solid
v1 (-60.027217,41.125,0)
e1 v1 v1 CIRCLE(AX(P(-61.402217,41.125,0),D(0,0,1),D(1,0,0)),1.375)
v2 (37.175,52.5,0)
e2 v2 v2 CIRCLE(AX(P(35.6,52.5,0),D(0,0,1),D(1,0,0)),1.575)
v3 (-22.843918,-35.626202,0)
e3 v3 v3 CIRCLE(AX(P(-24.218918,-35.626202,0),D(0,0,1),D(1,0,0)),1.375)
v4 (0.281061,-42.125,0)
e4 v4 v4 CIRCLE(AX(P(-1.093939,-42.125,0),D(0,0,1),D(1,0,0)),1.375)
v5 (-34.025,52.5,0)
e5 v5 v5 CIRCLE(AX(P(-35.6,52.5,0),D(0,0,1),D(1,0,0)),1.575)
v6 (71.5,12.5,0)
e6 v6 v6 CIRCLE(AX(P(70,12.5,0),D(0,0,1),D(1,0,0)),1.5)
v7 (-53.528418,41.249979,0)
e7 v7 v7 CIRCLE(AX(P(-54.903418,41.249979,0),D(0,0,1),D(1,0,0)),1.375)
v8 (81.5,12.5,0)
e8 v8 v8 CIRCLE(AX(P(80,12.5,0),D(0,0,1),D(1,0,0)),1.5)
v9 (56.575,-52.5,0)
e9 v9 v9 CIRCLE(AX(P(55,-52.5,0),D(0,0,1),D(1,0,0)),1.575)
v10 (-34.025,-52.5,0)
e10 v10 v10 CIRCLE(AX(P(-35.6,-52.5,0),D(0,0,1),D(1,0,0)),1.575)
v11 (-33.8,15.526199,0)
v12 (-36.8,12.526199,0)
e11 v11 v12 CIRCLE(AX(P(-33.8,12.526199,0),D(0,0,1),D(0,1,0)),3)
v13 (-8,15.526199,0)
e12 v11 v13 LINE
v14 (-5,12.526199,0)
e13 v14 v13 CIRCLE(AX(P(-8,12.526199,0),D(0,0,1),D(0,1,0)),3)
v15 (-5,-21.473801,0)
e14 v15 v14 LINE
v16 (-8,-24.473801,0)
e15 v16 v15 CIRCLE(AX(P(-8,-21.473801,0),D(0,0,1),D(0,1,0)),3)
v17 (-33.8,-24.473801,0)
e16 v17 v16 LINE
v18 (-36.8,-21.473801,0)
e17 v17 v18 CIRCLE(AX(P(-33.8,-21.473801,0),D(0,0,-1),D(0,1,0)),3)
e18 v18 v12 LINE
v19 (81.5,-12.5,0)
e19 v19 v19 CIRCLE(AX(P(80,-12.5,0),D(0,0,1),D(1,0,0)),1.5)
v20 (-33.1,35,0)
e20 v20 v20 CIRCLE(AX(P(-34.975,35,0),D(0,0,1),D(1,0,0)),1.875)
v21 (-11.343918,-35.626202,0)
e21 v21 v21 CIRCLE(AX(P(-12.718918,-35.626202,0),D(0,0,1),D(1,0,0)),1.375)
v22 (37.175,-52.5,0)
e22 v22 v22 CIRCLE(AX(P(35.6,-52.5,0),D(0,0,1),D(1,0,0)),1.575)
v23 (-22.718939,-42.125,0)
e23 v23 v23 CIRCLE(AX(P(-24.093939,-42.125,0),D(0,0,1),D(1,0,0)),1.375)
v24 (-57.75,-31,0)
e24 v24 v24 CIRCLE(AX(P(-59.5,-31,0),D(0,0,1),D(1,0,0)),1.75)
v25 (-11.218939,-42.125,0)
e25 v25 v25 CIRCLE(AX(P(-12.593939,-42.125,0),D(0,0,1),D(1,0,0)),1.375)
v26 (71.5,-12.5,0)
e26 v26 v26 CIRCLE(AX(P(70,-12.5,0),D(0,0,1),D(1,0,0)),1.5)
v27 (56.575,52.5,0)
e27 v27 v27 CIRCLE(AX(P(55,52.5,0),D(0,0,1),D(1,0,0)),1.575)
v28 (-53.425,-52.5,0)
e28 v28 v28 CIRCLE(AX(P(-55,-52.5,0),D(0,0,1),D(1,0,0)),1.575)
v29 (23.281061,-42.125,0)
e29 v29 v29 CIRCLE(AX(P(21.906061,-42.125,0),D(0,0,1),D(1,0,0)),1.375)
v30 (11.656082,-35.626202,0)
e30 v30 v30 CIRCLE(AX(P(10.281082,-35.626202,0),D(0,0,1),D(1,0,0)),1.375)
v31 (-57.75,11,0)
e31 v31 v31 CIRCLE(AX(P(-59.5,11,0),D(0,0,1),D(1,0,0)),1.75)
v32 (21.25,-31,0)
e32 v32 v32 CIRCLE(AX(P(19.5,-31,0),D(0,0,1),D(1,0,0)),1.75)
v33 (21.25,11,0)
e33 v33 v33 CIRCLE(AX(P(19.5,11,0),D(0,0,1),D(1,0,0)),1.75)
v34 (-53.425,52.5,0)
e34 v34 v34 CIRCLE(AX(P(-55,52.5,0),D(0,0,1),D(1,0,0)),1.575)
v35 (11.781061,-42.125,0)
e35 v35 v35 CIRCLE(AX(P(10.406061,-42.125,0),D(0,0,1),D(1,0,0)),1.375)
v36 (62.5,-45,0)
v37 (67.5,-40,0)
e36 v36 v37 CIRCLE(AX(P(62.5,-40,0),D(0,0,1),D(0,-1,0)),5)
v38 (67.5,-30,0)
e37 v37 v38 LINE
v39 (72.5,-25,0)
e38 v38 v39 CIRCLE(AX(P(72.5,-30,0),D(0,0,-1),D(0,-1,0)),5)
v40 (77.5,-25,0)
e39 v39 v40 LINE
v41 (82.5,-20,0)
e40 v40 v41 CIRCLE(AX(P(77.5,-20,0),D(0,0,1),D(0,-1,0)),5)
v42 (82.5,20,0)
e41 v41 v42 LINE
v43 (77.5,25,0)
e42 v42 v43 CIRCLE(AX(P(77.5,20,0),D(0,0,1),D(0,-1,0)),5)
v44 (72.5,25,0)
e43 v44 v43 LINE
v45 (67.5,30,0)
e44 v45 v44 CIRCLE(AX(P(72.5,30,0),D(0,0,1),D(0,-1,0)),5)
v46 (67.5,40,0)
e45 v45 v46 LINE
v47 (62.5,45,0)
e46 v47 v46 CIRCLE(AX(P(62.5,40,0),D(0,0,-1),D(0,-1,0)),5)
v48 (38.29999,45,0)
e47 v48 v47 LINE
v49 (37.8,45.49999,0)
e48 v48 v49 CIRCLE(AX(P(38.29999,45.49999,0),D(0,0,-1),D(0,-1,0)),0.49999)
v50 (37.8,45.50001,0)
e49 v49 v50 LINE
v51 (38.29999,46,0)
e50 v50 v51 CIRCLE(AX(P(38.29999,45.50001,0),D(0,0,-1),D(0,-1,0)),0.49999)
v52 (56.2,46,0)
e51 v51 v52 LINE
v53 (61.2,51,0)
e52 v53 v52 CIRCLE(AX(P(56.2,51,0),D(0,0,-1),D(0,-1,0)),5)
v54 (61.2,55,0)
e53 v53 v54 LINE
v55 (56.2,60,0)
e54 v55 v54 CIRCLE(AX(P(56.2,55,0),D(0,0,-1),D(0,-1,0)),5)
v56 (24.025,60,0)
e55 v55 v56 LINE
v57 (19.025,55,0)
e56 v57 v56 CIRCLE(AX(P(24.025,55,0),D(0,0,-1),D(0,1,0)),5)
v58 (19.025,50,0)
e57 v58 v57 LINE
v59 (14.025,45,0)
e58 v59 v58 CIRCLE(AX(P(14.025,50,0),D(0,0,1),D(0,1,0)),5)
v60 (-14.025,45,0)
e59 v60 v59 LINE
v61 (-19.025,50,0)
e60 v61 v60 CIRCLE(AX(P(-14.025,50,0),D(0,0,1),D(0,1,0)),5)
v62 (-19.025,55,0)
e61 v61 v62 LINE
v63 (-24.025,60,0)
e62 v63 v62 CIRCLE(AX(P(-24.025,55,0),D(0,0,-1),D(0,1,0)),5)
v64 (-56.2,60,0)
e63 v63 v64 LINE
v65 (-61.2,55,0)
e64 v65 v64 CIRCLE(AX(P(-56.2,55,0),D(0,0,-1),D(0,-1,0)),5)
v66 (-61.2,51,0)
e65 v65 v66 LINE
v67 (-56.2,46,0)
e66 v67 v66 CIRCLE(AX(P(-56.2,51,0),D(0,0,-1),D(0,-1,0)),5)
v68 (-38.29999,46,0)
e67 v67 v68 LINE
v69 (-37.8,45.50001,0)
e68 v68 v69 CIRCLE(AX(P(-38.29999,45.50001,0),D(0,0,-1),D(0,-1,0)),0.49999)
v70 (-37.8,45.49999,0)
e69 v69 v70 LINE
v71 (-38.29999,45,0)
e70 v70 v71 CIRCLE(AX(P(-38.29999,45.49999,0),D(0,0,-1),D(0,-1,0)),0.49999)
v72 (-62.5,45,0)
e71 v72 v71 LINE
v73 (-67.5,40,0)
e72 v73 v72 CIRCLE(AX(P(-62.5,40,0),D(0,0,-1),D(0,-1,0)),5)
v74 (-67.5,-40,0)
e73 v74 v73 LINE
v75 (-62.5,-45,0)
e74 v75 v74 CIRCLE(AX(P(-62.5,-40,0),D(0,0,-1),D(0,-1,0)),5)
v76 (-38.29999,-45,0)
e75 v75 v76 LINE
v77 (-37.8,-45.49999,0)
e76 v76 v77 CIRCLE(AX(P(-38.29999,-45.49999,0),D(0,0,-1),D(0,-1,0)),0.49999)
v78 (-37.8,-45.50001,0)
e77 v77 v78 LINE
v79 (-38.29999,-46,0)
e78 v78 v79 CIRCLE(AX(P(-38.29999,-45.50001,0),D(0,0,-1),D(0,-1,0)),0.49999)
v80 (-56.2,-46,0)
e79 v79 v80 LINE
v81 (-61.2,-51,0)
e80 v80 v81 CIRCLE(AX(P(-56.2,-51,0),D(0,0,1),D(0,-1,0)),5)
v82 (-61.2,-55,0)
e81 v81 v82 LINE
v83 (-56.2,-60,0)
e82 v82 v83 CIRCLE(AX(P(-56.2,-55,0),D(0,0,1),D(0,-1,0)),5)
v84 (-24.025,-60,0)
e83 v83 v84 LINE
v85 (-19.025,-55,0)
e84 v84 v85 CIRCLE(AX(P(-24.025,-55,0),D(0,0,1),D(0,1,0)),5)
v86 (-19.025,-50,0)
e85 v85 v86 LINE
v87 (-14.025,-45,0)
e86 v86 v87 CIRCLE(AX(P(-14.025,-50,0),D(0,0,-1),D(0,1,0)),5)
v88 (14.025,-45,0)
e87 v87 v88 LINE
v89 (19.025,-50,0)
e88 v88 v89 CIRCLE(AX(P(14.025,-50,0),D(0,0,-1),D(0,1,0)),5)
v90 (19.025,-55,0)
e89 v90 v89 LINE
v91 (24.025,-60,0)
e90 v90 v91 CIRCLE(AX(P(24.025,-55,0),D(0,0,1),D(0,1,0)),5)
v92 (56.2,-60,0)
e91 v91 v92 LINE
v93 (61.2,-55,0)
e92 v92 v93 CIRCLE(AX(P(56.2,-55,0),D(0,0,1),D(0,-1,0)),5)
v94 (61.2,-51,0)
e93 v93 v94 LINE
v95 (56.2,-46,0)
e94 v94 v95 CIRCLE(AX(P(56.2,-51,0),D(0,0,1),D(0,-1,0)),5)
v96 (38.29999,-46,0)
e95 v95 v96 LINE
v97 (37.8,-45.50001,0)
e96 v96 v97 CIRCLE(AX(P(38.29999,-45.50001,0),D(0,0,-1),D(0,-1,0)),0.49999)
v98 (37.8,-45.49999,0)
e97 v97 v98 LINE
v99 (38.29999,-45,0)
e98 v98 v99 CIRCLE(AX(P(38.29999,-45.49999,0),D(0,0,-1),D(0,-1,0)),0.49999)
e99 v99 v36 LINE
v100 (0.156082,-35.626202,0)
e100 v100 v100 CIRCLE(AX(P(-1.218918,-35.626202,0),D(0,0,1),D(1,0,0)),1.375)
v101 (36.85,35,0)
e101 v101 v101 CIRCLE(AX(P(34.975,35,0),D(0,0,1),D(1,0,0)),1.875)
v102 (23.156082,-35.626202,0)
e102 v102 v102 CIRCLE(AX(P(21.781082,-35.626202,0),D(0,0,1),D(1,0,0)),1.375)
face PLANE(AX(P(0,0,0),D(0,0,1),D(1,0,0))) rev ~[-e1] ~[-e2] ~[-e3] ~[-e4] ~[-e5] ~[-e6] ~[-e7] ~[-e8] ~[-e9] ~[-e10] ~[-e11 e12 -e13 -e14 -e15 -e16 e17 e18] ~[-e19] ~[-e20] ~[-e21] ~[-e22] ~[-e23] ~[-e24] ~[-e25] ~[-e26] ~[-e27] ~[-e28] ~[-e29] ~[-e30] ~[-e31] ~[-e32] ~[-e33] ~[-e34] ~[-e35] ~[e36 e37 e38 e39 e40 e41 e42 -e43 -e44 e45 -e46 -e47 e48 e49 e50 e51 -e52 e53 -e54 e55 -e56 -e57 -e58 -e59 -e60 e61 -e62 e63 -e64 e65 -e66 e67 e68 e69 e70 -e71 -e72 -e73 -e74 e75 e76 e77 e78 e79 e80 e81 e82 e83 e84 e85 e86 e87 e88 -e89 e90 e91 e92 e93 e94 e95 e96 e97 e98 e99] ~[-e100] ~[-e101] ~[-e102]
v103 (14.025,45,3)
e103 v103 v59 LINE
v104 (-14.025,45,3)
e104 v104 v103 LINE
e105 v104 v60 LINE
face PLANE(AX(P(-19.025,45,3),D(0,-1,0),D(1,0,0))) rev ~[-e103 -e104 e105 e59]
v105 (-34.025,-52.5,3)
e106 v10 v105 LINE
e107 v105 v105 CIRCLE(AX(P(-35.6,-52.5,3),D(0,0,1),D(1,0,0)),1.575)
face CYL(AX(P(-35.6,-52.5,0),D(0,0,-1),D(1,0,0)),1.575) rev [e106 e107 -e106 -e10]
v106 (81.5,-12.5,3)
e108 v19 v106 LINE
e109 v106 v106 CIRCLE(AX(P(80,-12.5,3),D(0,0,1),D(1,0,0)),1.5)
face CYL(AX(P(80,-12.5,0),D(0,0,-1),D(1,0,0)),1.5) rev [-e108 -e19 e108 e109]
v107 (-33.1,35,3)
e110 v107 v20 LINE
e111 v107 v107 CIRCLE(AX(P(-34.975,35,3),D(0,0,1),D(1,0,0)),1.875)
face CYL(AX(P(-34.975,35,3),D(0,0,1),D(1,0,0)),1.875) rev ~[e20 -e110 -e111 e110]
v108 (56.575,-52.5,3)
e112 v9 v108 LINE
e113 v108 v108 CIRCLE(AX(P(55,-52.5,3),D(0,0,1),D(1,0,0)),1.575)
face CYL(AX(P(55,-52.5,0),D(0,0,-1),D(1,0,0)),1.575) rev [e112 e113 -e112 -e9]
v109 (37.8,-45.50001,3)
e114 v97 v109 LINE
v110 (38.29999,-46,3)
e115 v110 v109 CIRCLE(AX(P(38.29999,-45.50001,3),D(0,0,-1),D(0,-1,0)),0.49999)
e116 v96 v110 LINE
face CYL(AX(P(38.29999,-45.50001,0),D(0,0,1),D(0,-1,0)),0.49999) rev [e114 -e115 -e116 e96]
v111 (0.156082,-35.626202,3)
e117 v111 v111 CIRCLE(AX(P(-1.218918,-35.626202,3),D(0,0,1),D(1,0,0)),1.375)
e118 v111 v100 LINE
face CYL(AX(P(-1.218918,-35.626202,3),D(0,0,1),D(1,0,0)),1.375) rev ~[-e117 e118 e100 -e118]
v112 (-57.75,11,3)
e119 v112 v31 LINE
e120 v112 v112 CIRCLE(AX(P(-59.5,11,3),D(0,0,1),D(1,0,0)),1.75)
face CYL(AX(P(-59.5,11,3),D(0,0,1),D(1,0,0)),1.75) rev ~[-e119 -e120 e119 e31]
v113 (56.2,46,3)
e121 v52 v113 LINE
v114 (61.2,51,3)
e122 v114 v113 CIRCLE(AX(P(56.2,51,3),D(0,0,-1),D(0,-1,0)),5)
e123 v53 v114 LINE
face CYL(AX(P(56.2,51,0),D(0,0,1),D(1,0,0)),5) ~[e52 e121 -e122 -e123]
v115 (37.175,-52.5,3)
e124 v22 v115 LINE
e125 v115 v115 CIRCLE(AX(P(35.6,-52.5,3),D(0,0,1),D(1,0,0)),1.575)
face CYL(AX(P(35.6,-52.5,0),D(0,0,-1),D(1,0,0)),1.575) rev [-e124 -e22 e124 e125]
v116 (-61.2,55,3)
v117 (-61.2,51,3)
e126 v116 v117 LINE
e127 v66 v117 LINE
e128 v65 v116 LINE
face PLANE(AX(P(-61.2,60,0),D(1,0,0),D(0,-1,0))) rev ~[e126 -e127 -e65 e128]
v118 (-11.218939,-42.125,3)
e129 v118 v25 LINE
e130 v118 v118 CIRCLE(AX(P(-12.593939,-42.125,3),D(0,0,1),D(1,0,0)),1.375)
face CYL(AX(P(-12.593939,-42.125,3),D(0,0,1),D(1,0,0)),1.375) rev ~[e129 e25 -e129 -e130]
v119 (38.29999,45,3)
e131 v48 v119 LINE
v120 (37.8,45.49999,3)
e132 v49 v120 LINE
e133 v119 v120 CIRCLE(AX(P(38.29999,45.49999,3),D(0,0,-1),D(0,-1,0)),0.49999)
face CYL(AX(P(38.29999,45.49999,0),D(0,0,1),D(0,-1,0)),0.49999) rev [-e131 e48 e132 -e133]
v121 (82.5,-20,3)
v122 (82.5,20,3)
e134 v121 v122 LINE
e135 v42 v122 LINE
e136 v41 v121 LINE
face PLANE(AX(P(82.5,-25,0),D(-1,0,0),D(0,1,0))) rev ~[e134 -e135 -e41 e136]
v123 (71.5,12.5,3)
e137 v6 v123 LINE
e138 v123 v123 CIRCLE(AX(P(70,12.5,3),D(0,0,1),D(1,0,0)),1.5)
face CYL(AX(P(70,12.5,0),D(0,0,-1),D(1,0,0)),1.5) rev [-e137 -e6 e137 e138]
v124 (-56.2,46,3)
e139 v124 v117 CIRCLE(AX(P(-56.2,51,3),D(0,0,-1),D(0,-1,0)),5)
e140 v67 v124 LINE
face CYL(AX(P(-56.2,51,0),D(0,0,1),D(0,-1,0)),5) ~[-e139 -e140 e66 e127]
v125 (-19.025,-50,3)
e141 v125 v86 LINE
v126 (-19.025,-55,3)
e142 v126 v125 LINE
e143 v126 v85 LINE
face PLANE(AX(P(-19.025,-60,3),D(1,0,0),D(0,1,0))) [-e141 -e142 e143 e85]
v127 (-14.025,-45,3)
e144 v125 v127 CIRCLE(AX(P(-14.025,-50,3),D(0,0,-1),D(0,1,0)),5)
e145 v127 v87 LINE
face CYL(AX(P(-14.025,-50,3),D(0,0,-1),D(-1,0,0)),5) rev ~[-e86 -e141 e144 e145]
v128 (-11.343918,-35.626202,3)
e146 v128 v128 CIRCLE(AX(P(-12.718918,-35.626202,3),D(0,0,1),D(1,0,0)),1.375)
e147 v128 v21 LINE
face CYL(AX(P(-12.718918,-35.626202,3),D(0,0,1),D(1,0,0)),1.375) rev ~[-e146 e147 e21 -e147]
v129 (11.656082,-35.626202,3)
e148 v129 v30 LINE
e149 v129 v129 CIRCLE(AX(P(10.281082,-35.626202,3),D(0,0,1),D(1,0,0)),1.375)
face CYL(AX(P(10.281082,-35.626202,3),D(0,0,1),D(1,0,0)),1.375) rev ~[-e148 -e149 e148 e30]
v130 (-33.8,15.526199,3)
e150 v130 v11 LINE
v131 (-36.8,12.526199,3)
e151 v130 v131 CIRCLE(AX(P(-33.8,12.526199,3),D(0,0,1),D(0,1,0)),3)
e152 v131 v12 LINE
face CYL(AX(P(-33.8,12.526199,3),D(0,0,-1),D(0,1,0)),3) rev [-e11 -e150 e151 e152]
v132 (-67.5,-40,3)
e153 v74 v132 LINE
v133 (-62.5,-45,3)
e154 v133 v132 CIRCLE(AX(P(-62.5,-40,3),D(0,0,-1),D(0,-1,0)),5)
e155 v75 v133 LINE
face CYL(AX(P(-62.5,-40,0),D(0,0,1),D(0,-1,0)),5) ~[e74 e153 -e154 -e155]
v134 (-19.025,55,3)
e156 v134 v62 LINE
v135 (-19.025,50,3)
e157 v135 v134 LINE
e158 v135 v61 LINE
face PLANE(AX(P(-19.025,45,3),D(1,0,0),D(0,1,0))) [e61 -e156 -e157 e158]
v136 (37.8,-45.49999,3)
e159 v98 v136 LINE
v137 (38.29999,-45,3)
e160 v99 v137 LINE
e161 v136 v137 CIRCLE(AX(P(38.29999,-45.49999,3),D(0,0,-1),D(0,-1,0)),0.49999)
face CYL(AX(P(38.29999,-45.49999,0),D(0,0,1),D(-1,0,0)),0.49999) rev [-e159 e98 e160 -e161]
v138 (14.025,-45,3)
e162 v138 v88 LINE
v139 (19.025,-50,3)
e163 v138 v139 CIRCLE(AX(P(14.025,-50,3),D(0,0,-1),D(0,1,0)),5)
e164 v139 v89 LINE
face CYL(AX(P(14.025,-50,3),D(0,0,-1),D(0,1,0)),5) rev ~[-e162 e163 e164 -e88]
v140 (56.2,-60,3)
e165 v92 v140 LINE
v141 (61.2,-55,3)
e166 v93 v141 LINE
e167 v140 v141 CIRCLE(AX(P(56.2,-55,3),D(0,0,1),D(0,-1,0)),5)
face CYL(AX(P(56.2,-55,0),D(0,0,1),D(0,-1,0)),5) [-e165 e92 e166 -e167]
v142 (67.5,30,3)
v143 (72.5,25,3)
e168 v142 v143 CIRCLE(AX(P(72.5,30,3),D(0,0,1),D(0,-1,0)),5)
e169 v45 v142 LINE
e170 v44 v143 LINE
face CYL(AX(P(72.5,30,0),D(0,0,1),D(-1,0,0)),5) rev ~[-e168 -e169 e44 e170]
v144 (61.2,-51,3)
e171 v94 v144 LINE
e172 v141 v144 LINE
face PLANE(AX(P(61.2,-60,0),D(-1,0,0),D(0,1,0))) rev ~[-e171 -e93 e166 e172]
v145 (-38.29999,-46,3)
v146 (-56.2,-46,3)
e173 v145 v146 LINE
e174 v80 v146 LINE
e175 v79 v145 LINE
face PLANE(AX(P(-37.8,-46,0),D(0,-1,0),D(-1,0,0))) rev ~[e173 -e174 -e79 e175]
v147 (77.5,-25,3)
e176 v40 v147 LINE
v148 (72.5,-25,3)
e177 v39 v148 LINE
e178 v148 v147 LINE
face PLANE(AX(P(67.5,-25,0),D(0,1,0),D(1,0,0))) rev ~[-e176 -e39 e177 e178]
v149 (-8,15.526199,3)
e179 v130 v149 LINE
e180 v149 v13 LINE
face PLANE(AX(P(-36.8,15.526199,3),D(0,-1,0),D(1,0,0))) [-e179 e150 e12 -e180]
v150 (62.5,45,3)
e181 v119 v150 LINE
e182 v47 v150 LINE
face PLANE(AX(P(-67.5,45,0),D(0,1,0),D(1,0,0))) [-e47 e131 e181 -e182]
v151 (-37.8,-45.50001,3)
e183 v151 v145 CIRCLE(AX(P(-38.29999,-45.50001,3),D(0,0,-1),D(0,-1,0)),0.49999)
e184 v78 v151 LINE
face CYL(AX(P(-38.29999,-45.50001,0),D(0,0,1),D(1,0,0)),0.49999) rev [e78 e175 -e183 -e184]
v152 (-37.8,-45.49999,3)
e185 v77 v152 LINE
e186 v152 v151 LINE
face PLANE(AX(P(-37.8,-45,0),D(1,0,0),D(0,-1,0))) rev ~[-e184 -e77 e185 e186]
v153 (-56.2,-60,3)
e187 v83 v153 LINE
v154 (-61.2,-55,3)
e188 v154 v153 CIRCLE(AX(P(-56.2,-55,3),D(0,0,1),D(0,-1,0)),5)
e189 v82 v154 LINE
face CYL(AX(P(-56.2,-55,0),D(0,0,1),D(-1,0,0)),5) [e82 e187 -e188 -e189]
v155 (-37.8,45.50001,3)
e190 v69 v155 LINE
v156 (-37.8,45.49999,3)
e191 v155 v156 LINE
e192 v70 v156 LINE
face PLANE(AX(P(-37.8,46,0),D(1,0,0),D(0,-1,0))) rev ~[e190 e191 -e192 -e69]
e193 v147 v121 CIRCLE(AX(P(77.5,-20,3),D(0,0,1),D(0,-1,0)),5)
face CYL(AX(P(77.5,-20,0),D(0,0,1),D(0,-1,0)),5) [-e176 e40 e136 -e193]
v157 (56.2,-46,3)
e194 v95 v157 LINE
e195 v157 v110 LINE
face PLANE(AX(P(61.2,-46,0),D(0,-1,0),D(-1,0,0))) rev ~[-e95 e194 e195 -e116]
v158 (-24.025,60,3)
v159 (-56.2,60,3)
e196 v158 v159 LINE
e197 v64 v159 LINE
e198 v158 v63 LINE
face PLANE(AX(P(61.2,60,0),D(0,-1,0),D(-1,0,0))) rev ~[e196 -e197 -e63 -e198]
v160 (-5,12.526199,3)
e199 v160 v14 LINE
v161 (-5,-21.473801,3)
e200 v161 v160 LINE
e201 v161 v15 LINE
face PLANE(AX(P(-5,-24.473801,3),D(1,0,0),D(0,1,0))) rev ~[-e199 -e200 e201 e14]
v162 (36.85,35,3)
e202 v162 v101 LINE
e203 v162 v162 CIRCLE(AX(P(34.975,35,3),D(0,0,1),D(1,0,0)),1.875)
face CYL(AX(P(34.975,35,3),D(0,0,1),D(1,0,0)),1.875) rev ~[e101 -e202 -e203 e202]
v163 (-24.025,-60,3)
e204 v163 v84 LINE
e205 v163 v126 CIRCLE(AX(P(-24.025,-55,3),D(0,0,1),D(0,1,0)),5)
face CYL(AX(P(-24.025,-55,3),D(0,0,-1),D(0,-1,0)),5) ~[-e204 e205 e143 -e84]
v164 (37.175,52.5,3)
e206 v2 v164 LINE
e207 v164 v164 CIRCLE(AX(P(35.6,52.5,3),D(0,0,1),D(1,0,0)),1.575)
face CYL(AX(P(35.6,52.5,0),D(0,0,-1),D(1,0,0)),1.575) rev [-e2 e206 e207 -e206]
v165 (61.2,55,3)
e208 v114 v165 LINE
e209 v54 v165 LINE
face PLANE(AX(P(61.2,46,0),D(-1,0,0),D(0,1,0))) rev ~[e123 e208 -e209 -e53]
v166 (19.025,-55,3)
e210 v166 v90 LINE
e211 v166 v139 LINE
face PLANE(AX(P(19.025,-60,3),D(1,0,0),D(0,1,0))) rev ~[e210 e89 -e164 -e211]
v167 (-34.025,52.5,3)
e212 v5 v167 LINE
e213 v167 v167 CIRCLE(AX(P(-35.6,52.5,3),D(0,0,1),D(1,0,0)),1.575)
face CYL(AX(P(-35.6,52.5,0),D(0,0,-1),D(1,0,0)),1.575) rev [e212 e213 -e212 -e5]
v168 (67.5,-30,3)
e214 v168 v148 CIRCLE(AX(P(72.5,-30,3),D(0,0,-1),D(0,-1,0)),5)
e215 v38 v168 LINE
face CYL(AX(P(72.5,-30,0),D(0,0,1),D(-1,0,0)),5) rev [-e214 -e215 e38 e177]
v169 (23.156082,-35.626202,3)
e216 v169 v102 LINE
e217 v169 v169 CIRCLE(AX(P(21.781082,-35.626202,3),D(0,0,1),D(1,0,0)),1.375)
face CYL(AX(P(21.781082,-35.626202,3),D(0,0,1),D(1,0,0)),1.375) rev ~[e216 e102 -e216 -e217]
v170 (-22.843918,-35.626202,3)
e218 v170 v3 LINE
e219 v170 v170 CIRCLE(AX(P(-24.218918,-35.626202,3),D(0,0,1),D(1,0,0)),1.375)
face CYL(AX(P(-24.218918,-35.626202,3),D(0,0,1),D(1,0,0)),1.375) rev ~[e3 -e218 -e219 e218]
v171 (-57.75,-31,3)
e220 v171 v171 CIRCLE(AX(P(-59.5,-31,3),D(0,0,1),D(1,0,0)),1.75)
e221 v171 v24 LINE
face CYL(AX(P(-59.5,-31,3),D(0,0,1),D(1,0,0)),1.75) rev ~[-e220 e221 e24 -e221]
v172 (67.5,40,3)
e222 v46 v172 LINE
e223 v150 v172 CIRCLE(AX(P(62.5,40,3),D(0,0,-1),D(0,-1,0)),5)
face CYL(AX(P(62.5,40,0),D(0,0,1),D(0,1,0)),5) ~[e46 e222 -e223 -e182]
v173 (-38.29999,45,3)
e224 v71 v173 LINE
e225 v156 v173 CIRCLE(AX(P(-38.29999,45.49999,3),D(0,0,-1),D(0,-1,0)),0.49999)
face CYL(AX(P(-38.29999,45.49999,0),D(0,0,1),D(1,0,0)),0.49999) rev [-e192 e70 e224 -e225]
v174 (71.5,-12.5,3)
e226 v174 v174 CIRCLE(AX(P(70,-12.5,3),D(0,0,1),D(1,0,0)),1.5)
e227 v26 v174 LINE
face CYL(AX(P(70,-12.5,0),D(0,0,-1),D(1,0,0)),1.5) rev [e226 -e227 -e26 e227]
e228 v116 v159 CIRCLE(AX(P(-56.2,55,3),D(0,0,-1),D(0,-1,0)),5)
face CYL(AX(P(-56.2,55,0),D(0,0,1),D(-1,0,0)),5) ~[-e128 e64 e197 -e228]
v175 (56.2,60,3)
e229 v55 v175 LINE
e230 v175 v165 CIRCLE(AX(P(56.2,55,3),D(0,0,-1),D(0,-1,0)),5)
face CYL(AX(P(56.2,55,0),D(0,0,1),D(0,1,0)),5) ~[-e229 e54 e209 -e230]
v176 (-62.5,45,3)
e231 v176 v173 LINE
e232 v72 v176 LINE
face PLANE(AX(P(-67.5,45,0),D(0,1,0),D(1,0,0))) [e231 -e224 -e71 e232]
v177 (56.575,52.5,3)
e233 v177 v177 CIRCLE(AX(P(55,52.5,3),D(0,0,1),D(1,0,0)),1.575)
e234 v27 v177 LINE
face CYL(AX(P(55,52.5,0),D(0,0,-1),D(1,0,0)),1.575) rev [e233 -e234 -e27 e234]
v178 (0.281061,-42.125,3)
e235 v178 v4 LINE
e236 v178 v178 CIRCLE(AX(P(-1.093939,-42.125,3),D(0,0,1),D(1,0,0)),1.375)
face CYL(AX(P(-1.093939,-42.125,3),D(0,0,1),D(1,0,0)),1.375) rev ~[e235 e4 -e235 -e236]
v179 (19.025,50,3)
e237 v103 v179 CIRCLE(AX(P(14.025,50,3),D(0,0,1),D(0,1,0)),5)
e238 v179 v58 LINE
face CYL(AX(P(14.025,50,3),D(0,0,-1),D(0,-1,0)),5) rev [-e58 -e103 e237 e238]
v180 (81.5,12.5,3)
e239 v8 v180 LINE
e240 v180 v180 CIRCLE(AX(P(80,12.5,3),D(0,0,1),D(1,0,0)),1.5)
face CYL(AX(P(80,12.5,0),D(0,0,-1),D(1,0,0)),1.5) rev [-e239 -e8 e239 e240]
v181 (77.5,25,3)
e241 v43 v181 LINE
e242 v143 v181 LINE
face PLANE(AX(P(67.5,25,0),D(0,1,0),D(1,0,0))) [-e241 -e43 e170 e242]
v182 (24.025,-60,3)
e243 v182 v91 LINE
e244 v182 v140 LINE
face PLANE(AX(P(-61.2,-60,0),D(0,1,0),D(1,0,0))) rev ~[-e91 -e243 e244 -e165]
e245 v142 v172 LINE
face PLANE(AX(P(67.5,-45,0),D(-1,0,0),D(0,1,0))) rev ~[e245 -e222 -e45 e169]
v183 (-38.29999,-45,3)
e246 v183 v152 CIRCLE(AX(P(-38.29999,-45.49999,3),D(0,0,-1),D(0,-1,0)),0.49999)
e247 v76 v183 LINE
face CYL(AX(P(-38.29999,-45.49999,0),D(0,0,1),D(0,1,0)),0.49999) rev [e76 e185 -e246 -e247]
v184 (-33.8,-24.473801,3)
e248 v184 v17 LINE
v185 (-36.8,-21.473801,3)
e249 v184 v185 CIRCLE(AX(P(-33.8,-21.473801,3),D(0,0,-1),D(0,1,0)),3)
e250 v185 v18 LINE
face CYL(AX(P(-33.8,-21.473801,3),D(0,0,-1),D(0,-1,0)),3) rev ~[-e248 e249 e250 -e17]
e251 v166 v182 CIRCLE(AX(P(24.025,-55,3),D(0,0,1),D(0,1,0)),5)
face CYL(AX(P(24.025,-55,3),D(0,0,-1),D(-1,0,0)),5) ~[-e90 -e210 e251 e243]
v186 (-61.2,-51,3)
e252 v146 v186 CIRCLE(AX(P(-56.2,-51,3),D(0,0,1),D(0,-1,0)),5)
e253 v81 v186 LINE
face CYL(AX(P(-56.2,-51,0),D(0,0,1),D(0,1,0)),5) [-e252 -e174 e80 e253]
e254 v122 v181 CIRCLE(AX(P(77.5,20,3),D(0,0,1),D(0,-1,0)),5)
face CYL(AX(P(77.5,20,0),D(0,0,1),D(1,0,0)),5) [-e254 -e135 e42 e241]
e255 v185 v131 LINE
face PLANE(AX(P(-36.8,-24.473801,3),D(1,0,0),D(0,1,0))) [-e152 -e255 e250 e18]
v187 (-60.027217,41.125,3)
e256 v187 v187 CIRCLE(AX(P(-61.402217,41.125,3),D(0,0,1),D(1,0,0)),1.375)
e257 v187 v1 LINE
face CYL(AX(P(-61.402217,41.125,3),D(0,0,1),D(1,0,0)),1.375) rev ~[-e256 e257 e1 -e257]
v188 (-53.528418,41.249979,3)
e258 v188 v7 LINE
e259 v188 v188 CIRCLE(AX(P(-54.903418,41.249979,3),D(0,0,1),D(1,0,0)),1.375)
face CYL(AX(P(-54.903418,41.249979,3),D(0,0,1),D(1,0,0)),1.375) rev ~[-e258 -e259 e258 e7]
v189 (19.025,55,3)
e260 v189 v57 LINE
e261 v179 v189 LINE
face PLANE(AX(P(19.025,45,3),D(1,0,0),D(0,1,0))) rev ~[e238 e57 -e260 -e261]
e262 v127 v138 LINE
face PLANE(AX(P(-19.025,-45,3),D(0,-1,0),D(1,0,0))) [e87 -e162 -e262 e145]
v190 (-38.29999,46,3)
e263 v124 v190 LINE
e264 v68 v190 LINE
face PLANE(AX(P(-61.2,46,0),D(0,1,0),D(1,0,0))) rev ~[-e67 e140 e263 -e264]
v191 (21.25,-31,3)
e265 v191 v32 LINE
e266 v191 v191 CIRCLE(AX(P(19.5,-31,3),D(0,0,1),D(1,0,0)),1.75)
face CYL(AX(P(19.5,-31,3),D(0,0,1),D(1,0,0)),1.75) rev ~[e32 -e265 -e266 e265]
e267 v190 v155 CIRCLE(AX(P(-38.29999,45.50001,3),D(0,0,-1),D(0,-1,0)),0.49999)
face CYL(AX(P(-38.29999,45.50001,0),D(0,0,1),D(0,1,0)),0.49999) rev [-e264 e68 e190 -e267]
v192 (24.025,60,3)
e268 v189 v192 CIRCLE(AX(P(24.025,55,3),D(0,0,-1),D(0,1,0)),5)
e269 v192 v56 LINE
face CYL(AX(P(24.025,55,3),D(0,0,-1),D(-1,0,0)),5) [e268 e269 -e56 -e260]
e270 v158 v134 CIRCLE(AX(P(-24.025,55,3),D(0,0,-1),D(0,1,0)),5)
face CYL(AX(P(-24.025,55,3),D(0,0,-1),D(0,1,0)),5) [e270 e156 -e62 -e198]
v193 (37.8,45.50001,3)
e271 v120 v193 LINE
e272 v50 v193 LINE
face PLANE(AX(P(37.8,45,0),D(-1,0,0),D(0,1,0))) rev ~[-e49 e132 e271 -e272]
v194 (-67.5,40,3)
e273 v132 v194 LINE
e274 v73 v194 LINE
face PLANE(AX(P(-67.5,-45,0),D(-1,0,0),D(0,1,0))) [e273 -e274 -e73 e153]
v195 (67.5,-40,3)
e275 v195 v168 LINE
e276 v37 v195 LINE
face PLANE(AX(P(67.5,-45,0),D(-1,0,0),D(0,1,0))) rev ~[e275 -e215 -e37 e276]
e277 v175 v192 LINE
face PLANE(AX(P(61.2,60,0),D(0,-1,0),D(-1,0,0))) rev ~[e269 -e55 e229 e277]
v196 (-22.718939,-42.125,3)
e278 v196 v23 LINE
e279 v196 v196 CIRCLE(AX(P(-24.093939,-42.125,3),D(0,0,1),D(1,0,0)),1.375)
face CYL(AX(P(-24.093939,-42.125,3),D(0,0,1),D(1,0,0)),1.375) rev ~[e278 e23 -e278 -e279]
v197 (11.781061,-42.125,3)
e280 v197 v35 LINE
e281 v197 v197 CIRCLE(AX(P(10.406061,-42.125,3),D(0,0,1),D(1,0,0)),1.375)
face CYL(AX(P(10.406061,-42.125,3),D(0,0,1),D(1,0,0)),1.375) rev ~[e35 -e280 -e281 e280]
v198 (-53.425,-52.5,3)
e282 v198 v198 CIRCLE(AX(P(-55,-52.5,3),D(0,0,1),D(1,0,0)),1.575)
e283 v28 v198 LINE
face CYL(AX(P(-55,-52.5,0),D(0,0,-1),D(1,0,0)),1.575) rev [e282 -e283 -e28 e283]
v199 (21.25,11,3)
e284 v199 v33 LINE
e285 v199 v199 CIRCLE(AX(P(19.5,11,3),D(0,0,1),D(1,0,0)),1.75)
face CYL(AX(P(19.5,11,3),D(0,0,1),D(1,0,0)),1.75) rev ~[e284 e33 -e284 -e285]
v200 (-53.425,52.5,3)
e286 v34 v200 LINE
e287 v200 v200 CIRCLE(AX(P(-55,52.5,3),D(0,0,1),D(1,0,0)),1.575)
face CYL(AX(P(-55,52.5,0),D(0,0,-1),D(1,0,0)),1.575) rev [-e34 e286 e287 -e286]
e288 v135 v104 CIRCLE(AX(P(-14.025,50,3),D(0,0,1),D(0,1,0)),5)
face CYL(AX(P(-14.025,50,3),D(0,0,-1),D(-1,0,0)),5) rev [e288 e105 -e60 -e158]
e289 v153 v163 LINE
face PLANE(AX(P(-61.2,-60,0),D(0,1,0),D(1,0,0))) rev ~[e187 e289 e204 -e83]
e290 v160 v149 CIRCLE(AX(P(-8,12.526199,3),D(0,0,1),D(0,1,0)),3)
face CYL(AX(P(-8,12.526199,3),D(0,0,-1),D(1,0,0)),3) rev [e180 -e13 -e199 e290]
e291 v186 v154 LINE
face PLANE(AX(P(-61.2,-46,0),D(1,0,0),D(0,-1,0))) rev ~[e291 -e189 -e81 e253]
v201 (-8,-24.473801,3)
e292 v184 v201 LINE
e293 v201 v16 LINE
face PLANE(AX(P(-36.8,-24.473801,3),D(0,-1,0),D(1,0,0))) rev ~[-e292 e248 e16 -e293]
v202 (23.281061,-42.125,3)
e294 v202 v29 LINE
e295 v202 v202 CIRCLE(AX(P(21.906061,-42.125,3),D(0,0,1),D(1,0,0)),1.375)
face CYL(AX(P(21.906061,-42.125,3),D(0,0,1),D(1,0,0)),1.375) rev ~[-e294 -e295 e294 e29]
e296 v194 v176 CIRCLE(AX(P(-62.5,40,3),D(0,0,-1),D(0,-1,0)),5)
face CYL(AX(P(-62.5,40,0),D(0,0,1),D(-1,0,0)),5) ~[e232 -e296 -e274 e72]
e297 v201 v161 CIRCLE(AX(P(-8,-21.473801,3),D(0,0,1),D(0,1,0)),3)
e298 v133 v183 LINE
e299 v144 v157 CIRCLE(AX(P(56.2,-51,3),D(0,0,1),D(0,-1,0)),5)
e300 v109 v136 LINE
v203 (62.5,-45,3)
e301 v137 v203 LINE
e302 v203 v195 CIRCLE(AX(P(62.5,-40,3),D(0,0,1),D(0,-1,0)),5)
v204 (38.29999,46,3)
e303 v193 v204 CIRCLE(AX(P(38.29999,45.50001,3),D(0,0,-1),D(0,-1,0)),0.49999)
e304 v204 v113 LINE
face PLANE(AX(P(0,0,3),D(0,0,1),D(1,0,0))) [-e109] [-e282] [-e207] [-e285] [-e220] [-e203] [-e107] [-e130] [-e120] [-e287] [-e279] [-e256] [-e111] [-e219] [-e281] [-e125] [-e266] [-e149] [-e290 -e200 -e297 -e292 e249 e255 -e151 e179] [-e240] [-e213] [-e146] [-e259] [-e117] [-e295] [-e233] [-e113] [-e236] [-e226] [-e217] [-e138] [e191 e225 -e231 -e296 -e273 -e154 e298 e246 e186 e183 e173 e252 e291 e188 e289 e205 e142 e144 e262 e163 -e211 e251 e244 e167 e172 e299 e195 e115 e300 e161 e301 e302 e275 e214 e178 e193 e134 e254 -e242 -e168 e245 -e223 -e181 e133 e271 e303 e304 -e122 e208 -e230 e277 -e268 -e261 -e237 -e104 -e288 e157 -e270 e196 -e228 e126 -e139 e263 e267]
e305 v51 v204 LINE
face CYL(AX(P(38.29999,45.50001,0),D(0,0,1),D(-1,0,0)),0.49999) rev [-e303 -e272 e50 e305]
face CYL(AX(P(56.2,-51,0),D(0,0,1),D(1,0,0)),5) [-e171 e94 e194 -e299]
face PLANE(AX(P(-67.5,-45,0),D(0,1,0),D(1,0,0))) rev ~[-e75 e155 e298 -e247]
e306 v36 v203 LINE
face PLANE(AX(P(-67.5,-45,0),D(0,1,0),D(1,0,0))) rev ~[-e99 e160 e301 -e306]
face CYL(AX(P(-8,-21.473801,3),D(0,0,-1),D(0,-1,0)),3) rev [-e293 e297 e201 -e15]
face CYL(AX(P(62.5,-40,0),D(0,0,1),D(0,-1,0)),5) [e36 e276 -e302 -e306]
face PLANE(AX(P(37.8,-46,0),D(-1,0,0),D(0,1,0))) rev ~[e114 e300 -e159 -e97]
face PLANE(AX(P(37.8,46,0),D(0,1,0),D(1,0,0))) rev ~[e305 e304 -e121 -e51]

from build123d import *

# Parameters (mm, degrees)
F0_W      = 135
F0_H      = 90
F1_DEPTH  = 3
F3_R      = 1.75
F4_DEPTH  = 3.001
F5_R      = 1.575
F6_DEPTH  = 3
F7_W      = 38.05
F7_H      = 15
F8_DEPTH  = 3
F9_R      = 1.375
F10_DEPTH = 3
F11_W     = 31.8
F11_H     = 40
F12_DEPTH = 3
F13_W     = 15
F13_H     = 50
F13_R     = 1.5
F14_DEPTH = 3
F15_R     = 3
F16_R     = 0.49999
F17_R     = 5
F18_R     = 1.875
F19_DEPTH = 3.001


# Not quite as in the source:
# - a fillet or chamfer is up to 0.001 mm smaller than in the source, because OpenCascade refuses the exact size
# - a feature names something its author has since deleted; it is built from what else it names


with BuildPart() as f1:
    # F0 (on Top) → F1 (new body)
    with BuildSketch(Plane.XY):
        Rectangle(F0_W, F0_H)
    extrude(amount=F1_DEPTH)

    # F3 (on face) → F4 (cut, through all)
    with BuildSketch(Plane.XY.offset(3)):
        with Locations((-59.5, 11)):
            Circle(F3_R)
        with Locations((19.5, 11)):
            Circle(F3_R)
        with Locations((19.5, -31)):
            Circle(F3_R)
        with Locations((-59.5, -31)):
            Circle(F3_R)
    extrude(amount=-F4_DEPTH, mode=Mode.SUBTRACT)

    # F5 (on Top) → F6 (join, through all)
    with BuildSketch(Plane.XY):
        Polygon((-37.8, 46), (-37.8, 45), (37.8, 45), (37.8, 46), (61.2, 46), (61.2, 60), (37.8, 60), (-37.7553022623, 60), (-37.8, 60), (-61.2, 60), (-61.2, 46), align=None)
        with Locations((-55, 52.5)):
            Circle(F5_R, mode=Mode.SUBTRACT)
        with Locations((-35.6, 52.5)):
            Circle(F5_R, mode=Mode.SUBTRACT)
        with Locations((35.6, 52.5)):
            Circle(F5_R, mode=Mode.SUBTRACT)
        with Locations((55, 52.5)):
            Circle(F5_R, mode=Mode.SUBTRACT)
        Polygon((37.8, -46), (37.8, -45), (-37.8, -45), (-37.8, -46), (-61.2, -46), (-61.2, -60), (-37.8, -60), (-37.7553022623, -60), (37.8, -60), (61.2, -60), (61.2, -46), align=None)
        with Locations((-55, -52.5)):
            Circle(F5_R, mode=Mode.SUBTRACT)
        with Locations((-35.6, -52.5)):
            Circle(F5_R, mode=Mode.SUBTRACT)
        with Locations((35.6, -52.5)):
            Circle(F5_R, mode=Mode.SUBTRACT)
        with Locations((55, -52.5)):
            Circle(F5_R, mode=Mode.SUBTRACT)
    extrude(amount=F6_DEPTH)

    # F7 (on face) → F8 (cut, through all)
    with BuildSketch(Plane.XY.offset(3)):
        with Locations((0, -52.5)):
            Rectangle(F7_W, F7_H)
        with Locations((0, 52.5)):
            Rectangle(F7_W, F7_H)
    extrude(amount=-F8_DEPTH, mode=Mode.SUBTRACT)

    # F9 (on face) → F10 (cut, through all)
    with BuildSketch(Plane.XY.offset(3)):
        with Locations((-61.4022165537, 41.125)):
            Circle(F9_R)
        with Locations((-54.9034181798, 41.2499787819)):
            Circle(F9_R)
        with Locations((-24.2189181921, -35.6262016261)):
            Circle(F9_R)
        with Locations((-24.0939394102, -42.125)):
            Circle(F9_R)
        with Locations((-12.5939394102, -42.125)):
            Circle(F9_R)
        with Locations((-12.7189181921, -35.6262016261)):
            Circle(F9_R)
        with Locations((-1.0939394102, -42.125)):
            Circle(F9_R)
        with Locations((-1.2189181921, -35.6262016261)):
            Circle(F9_R)
        with Locations((10.4060605898, -42.125)):
            Circle(F9_R)
        with Locations((10.2810818079, -35.6262016261)):
            Circle(F9_R)
        with Locations((21.9060605898, -42.125)):
            Circle(F9_R)
        with Locations((21.7810818079, -35.6262016261)):
            Circle(F9_R)
    extrude(amount=-F10_DEPTH, mode=Mode.SUBTRACT)

    # F11 (on face) → F12 (cut, through all)
    with BuildSketch(Plane.XY.offset(3)):
        with Locations((-20.9, -4.4738012552)):
            Rectangle(F11_W, F11_H)
    extrude(amount=-F12_DEPTH, mode=Mode.SUBTRACT)

    # F13 (on Top) → F14 (join, through all)
    with BuildSketch(Plane.XY):
        with Locations((75, 0)):
            Rectangle(F13_W, F13_H)
        with Locations((70, -12.5)):
            Circle(F13_R, mode=Mode.SUBTRACT)
        with Locations((80, -12.5)):
            Circle(F13_R, mode=Mode.SUBTRACT)
        with Locations((70, 12.5)):
            Circle(F13_R, mode=Mode.SUBTRACT)
        with Locations((80, 12.5)):
            Circle(F13_R, mode=Mode.SUBTRACT)
    extrude(amount=F14_DEPTH)

    # F15
    f15_edges = [f1.edges().sort_by_distance(p)[0] for p in [
        (-36.8, -24.473801, 1.5),
        (-5, -24.473801, 1.5),
        (-5, 15.526199, 1.5),
        (-36.8, 15.526199, 1.5),
    ]]
    fillet(f15_edges, radius=F15_R)

    # F16 (radius 0.5 in the source; OpenCascade refuses exactly that, so slightly less here)
    f16_edges = [f1.edges().sort_by_distance(p)[0] for p in [
        (-37.8, 46, 1.5),
        (-37.8, 45, 1.5),
        (37.8, 46, 1.5),
        (37.8, 45, 1.5),
        (37.8, -45, 1.5),
        (37.8, -46, 1.5),
        (-37.8, -46, 1.5),
        (-37.8, -45, 1.5),
    ]]
    fillet(f16_edges, radius=F16_R)

    # F17
    f17_edges = [f1.edges().sort_by_distance(p)[0] for p in [
        (-19.025, -60, 1.5),
        (-19.025, -45, 1.5),
        (-61.2, -60, 1.5),
        (-61.2, -46, 1.5),
        (-67.5, -45, 1.5),
        (19.025, -60, 1.5),
        (19.025, -45, 1.5),
        (61.2, -60, 1.5),
        (61.2, -46, 1.5),
        (67.5, -45, 1.5),
        (61.2, 46, 1.5),
        (67.5, 45, 1.5),
        (61.2, 60, 1.5),
        (19.025, 45, 1.5),
        (19.025, 60, 1.5),
        (-19.025, 45, 1.5),
        (-19.025, 60, 1.5),
        (-61.2, 46, 1.5),
        (-61.2, 60, 1.5),
        (-67.5, 45, 1.5),
        (67.5, -25, 1.5),
        (82.5, -25, 1.5),
        (67.5, 25, 1.5),
        (82.5, 25, 1.5),
    ]]
    fillet(f17_edges, radius=F17_R)

    # F18 (on face) → F19 (cut, through all)
    with BuildSketch(Plane.XY.offset(3)):
        with Locations((-34.975, 35)):
            Circle(F18_R)
        with Locations((34.975, 35)):
            Circle(F18_R)
    extrude(amount=-F19_DEPTH, mode=Mode.SUBTRACT)


solid = f1.part
